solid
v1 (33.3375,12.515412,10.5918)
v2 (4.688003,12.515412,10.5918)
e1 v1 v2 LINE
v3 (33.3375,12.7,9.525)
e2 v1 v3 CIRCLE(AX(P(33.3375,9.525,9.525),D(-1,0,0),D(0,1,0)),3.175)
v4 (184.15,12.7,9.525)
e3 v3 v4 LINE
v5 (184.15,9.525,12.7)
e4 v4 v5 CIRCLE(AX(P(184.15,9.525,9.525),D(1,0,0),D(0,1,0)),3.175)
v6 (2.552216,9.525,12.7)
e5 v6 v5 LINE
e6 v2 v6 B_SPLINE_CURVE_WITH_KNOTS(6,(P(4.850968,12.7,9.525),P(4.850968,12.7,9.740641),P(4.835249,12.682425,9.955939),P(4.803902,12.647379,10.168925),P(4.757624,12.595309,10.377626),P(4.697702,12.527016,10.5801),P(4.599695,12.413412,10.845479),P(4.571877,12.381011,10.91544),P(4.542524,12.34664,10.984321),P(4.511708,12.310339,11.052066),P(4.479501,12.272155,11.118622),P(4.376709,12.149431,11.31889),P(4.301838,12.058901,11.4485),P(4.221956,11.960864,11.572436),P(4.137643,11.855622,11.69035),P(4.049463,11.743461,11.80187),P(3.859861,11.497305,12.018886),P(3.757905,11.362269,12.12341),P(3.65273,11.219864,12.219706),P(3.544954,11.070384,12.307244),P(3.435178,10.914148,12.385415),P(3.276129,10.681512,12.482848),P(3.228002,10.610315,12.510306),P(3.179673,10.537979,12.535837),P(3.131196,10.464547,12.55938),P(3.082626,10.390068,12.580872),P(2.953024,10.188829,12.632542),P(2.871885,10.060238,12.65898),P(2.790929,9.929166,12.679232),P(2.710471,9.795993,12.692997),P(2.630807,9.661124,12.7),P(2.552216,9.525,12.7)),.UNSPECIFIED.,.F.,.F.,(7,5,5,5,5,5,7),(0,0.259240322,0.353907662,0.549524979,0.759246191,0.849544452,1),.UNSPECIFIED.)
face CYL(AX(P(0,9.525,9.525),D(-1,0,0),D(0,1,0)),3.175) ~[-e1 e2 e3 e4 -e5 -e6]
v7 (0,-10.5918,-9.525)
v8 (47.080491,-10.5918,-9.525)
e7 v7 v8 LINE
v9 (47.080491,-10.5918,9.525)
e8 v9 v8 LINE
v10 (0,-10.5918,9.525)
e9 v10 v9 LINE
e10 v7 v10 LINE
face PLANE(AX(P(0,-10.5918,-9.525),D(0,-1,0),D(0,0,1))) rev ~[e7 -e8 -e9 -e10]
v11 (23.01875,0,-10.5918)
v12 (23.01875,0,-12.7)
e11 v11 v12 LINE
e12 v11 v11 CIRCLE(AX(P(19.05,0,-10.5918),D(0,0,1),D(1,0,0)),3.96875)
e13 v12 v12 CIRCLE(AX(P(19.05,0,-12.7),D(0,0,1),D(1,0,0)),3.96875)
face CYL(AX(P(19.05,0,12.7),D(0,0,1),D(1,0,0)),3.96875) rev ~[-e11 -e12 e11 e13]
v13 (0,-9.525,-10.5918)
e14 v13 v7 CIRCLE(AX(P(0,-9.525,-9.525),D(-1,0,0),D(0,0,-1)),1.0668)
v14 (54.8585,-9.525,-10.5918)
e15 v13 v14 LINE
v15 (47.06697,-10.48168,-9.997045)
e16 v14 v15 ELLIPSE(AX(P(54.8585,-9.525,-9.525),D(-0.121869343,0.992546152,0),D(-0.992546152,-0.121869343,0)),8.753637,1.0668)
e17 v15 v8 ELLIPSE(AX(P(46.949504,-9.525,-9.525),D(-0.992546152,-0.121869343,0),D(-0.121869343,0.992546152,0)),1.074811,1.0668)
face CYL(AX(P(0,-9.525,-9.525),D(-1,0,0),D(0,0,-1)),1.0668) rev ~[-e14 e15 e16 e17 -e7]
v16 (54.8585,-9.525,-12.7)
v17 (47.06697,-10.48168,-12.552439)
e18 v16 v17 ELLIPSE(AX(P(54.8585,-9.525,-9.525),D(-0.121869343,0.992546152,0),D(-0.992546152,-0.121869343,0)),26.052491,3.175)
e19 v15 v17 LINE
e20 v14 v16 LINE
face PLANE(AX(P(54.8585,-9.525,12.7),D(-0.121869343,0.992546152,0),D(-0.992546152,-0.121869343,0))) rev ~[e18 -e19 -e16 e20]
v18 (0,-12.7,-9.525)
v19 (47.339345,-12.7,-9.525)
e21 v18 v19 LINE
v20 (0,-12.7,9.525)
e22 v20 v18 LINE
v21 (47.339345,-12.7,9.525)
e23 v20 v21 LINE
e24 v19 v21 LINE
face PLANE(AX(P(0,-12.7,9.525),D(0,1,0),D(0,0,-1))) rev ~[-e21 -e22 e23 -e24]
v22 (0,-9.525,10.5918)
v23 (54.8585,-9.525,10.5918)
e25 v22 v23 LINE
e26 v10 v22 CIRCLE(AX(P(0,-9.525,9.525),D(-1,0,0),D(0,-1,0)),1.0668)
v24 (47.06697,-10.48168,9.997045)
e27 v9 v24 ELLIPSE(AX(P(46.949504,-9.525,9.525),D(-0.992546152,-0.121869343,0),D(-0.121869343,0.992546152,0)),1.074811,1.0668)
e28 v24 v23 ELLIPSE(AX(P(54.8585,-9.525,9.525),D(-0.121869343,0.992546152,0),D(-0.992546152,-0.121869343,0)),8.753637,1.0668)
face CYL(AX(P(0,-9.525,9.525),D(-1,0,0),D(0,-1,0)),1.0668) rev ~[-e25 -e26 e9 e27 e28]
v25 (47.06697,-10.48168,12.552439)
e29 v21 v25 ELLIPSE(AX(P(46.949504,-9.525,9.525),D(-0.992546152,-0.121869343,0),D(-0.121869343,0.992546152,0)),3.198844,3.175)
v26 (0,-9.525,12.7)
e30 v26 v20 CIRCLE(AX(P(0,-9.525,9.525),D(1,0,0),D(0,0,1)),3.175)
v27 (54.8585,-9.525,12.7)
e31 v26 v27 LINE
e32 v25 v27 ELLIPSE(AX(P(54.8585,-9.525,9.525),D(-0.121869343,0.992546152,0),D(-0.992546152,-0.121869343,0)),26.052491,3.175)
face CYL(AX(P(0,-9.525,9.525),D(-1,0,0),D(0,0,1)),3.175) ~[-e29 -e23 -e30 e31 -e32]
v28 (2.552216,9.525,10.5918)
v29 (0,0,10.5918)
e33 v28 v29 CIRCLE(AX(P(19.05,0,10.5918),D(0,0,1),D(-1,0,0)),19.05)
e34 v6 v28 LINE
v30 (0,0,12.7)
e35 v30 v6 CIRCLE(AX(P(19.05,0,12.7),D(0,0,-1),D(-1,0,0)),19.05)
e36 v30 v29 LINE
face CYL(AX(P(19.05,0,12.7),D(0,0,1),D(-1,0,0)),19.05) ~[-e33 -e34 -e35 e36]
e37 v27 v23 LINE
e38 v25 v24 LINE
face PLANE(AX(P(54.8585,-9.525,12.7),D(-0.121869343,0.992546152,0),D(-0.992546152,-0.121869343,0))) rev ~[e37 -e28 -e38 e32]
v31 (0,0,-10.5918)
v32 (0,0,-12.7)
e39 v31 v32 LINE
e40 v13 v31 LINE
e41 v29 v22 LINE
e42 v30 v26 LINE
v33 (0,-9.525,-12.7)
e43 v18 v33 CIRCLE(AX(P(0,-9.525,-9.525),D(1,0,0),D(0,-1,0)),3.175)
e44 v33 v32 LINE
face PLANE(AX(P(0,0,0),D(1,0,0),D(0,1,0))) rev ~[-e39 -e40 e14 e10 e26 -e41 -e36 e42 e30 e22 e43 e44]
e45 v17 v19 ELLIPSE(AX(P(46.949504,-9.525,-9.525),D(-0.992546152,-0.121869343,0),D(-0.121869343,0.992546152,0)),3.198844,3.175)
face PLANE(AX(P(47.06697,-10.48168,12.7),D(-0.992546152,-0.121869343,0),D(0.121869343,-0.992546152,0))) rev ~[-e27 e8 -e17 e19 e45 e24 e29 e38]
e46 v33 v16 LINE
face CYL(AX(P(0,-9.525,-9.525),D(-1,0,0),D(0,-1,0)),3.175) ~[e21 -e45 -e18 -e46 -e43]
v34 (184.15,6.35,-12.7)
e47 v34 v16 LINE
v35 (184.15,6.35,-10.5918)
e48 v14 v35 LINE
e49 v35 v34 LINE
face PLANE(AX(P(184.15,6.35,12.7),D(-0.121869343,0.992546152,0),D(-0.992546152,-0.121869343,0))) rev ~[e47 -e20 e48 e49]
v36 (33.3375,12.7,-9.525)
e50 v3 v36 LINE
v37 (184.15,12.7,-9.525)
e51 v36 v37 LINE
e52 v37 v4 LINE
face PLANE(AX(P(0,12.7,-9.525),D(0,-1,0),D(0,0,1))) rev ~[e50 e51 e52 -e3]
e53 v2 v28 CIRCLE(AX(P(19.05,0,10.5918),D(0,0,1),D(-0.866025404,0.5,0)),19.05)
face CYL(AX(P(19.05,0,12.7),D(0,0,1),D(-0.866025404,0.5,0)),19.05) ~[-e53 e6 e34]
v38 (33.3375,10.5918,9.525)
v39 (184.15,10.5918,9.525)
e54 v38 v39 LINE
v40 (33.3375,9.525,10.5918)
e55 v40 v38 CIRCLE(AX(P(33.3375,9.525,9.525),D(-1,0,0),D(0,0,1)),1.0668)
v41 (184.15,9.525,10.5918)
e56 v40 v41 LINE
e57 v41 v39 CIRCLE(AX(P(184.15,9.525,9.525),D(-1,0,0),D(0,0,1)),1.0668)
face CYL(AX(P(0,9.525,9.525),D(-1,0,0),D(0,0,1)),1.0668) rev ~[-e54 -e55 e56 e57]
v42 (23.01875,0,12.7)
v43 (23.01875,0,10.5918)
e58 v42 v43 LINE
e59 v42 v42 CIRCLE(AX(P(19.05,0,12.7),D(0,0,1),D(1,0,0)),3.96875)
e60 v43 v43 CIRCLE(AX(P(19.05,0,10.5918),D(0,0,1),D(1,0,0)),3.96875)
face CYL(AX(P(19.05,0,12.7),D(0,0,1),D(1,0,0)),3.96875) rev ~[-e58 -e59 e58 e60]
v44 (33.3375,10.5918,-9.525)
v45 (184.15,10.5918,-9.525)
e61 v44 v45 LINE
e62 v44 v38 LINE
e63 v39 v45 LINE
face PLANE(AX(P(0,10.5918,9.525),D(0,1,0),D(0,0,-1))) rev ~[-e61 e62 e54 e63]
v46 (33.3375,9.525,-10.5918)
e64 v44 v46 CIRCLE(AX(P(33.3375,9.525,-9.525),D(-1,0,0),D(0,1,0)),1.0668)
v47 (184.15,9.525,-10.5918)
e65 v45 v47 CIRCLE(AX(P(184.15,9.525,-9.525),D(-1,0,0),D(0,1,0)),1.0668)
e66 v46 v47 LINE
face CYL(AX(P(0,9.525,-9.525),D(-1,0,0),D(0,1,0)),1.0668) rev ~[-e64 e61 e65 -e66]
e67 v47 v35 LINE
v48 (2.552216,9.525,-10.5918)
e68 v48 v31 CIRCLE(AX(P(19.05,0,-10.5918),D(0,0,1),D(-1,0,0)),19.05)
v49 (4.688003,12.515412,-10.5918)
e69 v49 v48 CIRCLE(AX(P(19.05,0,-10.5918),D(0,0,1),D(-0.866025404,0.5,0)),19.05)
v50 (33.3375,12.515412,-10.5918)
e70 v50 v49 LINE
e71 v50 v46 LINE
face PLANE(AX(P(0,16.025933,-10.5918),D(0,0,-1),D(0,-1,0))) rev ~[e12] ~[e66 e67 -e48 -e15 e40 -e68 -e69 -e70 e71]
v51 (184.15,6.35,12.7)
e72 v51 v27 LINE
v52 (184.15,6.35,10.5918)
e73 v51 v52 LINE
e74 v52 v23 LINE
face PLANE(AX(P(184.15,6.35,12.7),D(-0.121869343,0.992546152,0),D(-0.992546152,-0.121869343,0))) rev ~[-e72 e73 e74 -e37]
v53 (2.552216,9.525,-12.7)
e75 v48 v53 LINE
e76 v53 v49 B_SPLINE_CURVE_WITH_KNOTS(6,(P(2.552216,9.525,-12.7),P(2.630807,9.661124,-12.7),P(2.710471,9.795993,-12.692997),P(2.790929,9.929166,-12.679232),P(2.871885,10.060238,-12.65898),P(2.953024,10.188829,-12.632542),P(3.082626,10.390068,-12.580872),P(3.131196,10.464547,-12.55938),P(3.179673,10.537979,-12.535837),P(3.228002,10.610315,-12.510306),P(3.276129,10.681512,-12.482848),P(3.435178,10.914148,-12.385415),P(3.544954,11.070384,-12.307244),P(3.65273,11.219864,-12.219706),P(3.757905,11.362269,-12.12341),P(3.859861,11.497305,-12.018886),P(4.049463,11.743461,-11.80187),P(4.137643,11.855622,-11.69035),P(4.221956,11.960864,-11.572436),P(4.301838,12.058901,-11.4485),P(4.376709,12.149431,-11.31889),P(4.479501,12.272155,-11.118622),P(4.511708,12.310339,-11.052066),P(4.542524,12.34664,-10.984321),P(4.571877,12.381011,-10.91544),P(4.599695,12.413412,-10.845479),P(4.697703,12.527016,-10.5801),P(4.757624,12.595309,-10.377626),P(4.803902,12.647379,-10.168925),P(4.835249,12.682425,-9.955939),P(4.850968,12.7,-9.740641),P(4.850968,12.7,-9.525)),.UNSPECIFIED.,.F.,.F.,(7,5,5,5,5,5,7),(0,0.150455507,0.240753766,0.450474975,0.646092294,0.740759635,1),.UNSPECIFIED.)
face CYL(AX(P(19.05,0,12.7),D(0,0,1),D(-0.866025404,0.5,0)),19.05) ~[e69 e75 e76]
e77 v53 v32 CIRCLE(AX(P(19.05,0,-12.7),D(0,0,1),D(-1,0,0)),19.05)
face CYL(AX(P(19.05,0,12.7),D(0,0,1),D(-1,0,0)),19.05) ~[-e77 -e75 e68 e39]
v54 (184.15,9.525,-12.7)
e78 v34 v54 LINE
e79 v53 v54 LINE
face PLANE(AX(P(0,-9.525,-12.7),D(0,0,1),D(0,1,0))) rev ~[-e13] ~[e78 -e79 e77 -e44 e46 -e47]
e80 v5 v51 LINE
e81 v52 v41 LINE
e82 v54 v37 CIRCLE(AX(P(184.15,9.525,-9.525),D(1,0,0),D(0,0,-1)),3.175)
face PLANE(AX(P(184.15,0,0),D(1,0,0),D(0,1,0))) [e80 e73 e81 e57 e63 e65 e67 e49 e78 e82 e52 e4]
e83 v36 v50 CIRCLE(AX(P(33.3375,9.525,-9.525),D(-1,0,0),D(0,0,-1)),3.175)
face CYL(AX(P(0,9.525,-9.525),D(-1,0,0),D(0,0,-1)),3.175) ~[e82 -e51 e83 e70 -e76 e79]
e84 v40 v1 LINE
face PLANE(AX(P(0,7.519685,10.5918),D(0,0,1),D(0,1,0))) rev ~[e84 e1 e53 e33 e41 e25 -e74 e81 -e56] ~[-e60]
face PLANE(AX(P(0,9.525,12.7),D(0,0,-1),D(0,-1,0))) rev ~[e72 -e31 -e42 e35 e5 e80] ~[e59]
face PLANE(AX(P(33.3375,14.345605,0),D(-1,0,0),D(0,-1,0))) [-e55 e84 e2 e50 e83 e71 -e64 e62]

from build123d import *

# Parameters (mm, degrees)
F1_DEPTH = 184.15
F3_DEPTH = 33.3375
F4_R     = 3.96875
F5_DEPTH = 25.401
F7_DEPTH = 25.401
F9_DEPTH = 25.4010001


with BuildPart() as f1:
    # F0 (on Right) → F1 (new body)
    with BuildSketch(Plane.YZ):
        with BuildLine():
            Line((-9.525, -12.7), (9.525, -12.7))
            ThreePointArc((9.525, -12.7), (11.7700640303, -11.7700640303), (12.7, -9.525))
            Line((12.7, -9.525), (12.7, 9.525))
            ThreePointArc((12.7, 9.525), (11.7700640303, 11.7700640303), (9.525, 12.7))
            Line((9.525, 12.7), (-9.525, 12.7))
            ThreePointArc((-9.525, 12.7), (-11.7700640303, 11.7700640303), (-12.7, 9.525))
            Line((-12.7, 9.525), (-12.7, -9.525))
            ThreePointArc((-12.7, -9.525), (-11.7700640303, -11.7700640303), (-9.525, -12.7))
        make_face()
        with BuildLine():
            Line((-9.525, 10.5918), (9.525, 10.5918))
            ThreePointArc((9.525, 10.5918), (10.2793415142, 10.2793415142), (10.5918, 9.525))
            Line((10.5918, 9.525), (10.5918, -9.525))
            ThreePointArc((10.5918, -9.525), (10.2793415142, -10.2793415142), (9.525, -10.5918))
            Line((9.525, -10.5918), (-9.525, -10.5918))
            ThreePointArc((-9.525, -10.5918), (-10.2793415142, -10.2793415142), (-10.5918, -9.525))
            Line((-10.5918, -9.525), (-10.5918, 9.525))
            ThreePointArc((-10.5918, 9.525), (-10.2793415142, 10.2793415142), (-9.525, 10.5918))
        make_face(mode=Mode.SUBTRACT)
    extrude(amount=F1_DEPTH)

    # F2 (on face) → F3 (cut)
    with BuildSketch(Plane(origin=(0, 0, 0), x_dir=(0, -1, 0), z_dir=(-1, 0, 0))):
        with BuildLine():
            ThreePointArc((-12.7, 9.525), (-12.6535126242, 10.0663259281), (-12.5154118044, 10.5918))
            Line((-12.5154118044, 10.5918), (-16.0259325057, 10.5918))
            Line((-16.0259325057, 10.5918), (-16.0259325057, -10.5918))
            Line((-16.0259325057, -10.5918), (-12.5154118044, -10.5918))
            ThreePointArc((-12.5154118044, -10.5918), (-12.6535126242, -10.0663259281), (-12.7, -9.525))
            Line((-12.7, -9.525), (-12.7, 9.525))
        make_face()
        with BuildLine():
            Line((-7.5196851976, -10.5918), (-7.5196851976, 10.5918))
            Line((-7.5196851976, 10.5918), (-9.525, 10.5918))
            ThreePointArc((-9.525, 10.5918), (-10.2793415142, 10.2793415142), (-10.5918, 9.525))
            Line((-10.5918, 9.525), (-10.5918, -9.525))
            ThreePointArc((-10.5918, -9.525), (-10.2793415142, -10.2793415142), (-9.525, -10.5918))
            Line((-9.525, -10.5918), (-7.5196851976, -10.5918))
        make_face()
        with BuildLine():
            ThreePointArc((-10.5918, 9.525), (-10.2793415142, 10.2793415142), (-9.525, 10.5918))
            Line((-9.525, 10.5918), (-12.5154118044, 10.5918))
            ThreePointArc((-12.5154118044, 10.5918), (-12.6535126242, 10.0663259281), (-12.7, 9.525))
            Line((-12.7, 9.525), (-12.7, -9.525))
            ThreePointArc((-12.7, -9.525), (-12.6535126242, -10.0663259281), (-12.5154118044, -10.5918))
            Line((-12.5154118044, -10.5918), (-9.525, -10.5918))
            ThreePointArc((-9.525, -10.5918), (-10.2793415142, -10.2793415142), (-10.5918, -9.525))
            Line((-10.5918, -9.525), (-10.5918, 9.525))
        make_face()
    extrude(amount=-F3_DEPTH, mode=Mode.SUBTRACT)

    # F4 (on face) → F5 (cut, through all)
    with BuildSketch(Plane.XY.offset(12.7)):
        with Locations((19.05, 0)):
            Circle(F4_R)
    extrude(amount=-F5_DEPTH, mode=Mode.SUBTRACT)

    # F6 (on face) → F7 (cut, through all)
    with BuildSketch(Plane.XY.offset(12.7)):
        with BuildLine():
            ThreePointArc((2.5522160579, 9.525), (4.2134911079, 11.9490796254), (6.2278308065, 14.0888068044))
            Line((6.2278308065, 14.0888068044), (1.4018084571, 20.3806743289))
            ThreePointArc((1.4018084571, 20.3806743289), (-5.47164532, 11.203546833), (-7.9097950815, 0))
            Line((-7.9097950815, 0), (0, 0))
            Line((0, 0), (0, 9.525))
            Line((0, 9.525), (2.5522160579, 9.525))
        make_face()
        with BuildLine():
            ThreePointArc((0, 0), (0.6491130092, 4.9305028092), (2.5522160579, 9.525))
            Line((2.5522160579, 9.525), (0, 9.525))
            Line((0, 9.525), (0, 0))
        make_face()
    extrude(amount=-F7_DEPTH, mode=Mode.SUBTRACT)

    # F8 (on face) → F9 (cut, through all)
    with BuildSketch(Plane.XY.offset(12.7)):
        Polygon((184.15, -9.525), (184.15, 6.35), (54.8585004559, -9.525), align=None)
        Polygon((188.5616199521, -29.5797611986), (184.15, 6.35), (184.15, -9.525), (54.8585004559, -9.525), (47.0669696314, -10.481679691), (51.4785895836, -46.4114408897), align=None)
    extrude(amount=-F9_DEPTH, mode=Mode.SUBTRACT)


solid = f1.part
